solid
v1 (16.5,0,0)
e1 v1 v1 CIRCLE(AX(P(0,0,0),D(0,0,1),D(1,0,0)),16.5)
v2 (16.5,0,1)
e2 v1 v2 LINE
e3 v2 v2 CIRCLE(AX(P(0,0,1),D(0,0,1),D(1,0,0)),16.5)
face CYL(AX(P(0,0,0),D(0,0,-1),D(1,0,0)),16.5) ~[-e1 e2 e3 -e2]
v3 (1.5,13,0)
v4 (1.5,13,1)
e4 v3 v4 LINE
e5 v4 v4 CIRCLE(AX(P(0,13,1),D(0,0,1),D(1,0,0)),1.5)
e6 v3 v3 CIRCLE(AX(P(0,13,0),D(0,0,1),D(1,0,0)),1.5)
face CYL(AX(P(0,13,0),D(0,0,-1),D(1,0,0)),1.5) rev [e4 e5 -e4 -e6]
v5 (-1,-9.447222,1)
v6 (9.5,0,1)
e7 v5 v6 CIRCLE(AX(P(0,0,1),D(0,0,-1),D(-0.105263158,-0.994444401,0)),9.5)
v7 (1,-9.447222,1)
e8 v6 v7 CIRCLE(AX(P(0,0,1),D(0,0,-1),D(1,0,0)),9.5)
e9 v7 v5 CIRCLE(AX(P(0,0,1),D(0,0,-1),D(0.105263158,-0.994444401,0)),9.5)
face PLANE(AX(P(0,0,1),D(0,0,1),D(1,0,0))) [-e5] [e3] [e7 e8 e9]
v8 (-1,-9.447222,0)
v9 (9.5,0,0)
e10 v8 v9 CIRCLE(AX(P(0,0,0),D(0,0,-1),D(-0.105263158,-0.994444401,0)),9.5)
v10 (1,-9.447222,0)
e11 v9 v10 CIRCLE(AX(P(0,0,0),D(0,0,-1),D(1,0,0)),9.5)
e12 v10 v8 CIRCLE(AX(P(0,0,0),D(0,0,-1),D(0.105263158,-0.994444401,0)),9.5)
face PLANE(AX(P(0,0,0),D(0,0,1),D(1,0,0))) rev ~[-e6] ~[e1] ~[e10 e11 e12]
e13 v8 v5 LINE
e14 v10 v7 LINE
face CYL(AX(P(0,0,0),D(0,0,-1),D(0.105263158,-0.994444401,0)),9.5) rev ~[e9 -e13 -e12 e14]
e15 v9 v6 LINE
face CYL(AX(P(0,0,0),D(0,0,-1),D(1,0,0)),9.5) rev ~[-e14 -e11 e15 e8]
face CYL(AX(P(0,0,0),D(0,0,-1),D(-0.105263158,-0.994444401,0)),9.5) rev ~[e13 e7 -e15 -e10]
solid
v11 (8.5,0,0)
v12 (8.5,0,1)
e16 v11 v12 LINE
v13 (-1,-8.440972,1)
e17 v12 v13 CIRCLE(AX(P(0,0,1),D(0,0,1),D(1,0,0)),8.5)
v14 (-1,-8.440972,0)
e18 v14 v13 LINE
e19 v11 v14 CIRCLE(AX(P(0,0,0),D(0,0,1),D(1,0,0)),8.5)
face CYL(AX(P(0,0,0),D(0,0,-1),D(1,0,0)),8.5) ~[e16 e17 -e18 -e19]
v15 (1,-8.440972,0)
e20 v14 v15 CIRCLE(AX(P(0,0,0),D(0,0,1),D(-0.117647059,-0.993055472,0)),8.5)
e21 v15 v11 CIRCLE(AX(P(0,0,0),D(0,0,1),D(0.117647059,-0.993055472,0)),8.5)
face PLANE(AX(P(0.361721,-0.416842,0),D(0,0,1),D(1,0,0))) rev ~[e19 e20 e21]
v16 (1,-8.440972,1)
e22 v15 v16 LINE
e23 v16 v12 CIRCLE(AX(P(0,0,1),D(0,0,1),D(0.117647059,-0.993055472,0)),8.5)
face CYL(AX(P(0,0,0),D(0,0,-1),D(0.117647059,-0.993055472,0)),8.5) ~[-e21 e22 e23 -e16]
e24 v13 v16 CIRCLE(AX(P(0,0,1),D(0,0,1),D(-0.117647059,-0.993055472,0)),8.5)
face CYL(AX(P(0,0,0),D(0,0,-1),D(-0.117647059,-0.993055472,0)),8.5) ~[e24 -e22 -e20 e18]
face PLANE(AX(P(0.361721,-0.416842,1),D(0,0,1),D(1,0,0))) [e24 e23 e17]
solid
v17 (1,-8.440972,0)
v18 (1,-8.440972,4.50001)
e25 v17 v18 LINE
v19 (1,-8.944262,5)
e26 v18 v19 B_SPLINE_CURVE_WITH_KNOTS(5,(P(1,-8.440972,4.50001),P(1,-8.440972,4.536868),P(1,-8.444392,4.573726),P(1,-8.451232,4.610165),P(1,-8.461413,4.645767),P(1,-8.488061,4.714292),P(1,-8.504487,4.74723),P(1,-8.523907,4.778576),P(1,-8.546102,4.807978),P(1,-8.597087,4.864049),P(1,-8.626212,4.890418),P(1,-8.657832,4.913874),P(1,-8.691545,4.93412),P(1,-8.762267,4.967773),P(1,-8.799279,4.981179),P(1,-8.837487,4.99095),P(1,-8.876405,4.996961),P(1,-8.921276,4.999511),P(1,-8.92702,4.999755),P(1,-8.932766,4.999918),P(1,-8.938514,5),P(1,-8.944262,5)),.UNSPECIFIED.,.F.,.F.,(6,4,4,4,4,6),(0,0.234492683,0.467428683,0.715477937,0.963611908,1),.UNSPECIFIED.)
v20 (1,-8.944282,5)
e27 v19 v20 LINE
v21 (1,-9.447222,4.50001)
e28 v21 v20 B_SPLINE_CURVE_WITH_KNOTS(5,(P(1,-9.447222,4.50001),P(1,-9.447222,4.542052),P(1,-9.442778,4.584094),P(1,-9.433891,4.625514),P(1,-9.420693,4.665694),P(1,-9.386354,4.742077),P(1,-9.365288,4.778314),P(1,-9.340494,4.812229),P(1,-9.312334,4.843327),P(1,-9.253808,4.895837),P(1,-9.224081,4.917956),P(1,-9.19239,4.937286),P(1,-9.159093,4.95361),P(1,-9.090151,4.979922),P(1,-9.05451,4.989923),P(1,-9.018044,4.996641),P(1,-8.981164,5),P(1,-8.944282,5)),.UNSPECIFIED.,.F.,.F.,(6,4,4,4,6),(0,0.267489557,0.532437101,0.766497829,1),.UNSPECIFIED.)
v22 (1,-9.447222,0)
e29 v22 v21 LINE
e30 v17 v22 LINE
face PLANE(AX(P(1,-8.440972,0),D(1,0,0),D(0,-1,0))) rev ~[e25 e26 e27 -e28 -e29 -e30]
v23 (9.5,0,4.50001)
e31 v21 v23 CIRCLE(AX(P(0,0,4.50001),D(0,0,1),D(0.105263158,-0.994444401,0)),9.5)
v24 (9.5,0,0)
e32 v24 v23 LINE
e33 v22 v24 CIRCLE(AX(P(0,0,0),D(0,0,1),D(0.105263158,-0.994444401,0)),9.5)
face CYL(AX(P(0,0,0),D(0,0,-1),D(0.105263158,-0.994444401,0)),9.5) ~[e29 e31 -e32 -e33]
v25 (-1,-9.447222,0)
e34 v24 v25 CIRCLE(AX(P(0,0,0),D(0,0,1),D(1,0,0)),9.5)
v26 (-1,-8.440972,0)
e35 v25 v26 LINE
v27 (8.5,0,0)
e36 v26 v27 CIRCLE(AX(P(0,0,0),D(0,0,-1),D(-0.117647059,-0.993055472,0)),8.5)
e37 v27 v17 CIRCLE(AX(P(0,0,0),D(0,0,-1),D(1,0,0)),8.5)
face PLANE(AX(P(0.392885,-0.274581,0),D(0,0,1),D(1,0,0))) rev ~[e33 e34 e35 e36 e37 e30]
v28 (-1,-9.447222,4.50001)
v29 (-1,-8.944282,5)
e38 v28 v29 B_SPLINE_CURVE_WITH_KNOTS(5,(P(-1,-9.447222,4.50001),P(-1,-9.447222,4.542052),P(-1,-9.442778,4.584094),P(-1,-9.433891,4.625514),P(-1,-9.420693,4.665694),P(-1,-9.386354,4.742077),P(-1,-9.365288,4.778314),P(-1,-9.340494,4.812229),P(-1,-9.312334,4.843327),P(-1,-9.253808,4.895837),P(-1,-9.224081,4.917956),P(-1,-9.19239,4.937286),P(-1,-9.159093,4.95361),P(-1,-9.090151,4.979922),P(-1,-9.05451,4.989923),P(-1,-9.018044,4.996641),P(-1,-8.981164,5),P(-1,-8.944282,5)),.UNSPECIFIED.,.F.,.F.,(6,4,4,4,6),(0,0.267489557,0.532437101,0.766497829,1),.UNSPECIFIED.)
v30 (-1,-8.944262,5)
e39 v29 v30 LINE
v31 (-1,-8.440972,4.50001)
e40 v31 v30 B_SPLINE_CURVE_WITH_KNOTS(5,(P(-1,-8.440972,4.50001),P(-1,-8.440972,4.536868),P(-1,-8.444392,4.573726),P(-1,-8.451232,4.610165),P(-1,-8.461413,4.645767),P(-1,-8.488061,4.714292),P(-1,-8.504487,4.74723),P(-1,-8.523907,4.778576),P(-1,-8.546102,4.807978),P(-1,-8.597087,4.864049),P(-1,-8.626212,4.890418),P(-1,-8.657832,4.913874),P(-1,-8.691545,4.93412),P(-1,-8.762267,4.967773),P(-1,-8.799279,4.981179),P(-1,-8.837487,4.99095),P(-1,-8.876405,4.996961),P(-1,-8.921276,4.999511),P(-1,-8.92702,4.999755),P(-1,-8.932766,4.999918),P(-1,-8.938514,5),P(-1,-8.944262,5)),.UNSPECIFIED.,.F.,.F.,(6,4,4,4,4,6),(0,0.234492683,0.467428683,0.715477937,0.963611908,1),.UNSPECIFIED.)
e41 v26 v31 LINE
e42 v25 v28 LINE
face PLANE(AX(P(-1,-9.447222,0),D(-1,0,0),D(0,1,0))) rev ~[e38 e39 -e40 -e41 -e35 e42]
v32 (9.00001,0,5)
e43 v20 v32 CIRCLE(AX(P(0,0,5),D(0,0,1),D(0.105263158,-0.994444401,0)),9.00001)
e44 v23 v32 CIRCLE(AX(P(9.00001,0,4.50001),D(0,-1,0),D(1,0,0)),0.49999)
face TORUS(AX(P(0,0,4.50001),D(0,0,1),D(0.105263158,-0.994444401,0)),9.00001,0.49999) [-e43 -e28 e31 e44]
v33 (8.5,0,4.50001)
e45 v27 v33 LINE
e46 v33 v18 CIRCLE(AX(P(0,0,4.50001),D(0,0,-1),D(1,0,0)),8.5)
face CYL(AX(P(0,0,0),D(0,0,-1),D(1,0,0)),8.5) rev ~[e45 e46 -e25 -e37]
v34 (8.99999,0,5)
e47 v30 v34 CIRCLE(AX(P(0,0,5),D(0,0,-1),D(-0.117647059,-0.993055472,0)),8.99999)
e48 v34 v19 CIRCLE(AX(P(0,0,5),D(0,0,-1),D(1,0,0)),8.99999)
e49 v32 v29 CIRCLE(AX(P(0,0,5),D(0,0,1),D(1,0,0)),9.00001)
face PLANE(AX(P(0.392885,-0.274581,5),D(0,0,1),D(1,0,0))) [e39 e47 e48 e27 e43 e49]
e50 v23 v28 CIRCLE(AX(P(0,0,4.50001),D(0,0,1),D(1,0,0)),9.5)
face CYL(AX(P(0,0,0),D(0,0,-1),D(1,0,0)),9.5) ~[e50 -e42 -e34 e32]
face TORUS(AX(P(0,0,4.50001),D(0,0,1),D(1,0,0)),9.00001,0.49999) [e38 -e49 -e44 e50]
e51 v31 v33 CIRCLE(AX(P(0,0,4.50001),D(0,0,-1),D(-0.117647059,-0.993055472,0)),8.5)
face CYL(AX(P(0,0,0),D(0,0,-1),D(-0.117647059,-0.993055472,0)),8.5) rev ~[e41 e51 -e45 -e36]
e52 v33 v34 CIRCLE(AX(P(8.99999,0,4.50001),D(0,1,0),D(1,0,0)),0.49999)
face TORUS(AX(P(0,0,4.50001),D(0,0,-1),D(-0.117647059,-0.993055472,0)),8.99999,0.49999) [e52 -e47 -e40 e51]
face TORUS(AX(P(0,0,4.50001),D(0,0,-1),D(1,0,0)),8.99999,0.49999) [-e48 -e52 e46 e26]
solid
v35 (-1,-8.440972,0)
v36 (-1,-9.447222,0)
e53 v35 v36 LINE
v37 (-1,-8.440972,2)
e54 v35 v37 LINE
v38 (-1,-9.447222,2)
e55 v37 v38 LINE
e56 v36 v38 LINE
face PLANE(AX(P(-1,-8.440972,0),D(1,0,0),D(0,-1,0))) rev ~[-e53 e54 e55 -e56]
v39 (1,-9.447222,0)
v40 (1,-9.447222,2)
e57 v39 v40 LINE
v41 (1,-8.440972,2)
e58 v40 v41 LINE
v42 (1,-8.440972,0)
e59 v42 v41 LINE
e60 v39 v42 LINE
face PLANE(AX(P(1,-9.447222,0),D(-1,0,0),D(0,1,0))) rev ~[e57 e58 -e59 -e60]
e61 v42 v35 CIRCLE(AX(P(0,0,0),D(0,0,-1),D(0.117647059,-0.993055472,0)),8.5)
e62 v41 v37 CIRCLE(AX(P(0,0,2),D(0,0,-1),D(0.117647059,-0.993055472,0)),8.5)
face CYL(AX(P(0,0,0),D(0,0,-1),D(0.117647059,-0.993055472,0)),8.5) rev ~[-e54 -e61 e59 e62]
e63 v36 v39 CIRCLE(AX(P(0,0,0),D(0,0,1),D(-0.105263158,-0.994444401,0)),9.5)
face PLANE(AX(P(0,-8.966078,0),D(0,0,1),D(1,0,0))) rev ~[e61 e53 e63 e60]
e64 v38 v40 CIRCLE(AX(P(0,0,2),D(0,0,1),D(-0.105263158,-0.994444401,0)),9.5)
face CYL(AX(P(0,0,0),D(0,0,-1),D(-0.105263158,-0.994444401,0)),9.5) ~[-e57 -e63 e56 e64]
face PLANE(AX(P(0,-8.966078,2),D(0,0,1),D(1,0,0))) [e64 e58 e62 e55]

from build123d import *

# Parameters (mm, degrees)
F0_R     = 16.5
F0_R_2   = 1.5
F1_DEPTH = 1
F2_DEPTH = 5
F3_DEPTH = 2
F4_R     = 0.49999


# Not quite as in the source:
# - a fillet or chamfer is up to 0.001 mm smaller than in the source, because OpenCascade refuses the exact size


with BuildPart() as f1:
    # F0 (on Top) → F1 (new body)
    with BuildSketch(Plane.XY):
        Circle(F0_R)
        with BuildLine():
            ThreePointArc((-1, -9.4472218138), (-6.3541325136, 7.0622234459), (9.5, 0))
            ThreePointArc((9.5, 0), (7.0622234459, -6.3541325136), (1, -9.4472218138))
            ThreePointArc((1, -9.4472218138), (0, -9.5), (-1, -9.4472218138))
        make_face(mode=Mode.SUBTRACT)
        with Locations((0, 13)):
            Circle(F0_R_2, mode=Mode.SUBTRACT)
    extrude(amount=F1_DEPTH)


with BuildPart() as f1b:
    # F0 (on Top) → F1, piece 2 (new body)
    with BuildSketch(Plane.XY):
        with BuildLine():
            ThreePointArc((8.5, 0), (-5.6457948953, 6.3541325136), (-1, -8.4409715081))
            ThreePointArc((-1, -8.4409715081), (0, -8.5), (1, -8.4409715081))
            ThreePointArc((1, -8.4409715081), (6.3541325136, -5.6457948953), (8.5, 0))
        make_face()
    extrude(amount=F1_DEPTH)


with BuildPart() as f2:
    # F0 (on Top) → F2 (new body)
    with BuildSketch(Plane.XY):
        with BuildLine():
            ThreePointArc((1, -9.4472218138), (7.0622234459, -6.3541325136), (9.5, 0))
            ThreePointArc((9.5, 0), (-6.3541325136, 7.0622234459), (-1, -9.4472218138))
            Line((-1, -9.4472218138), (-1, -8.4409715081))
            ThreePointArc((-1, -8.4409715081), (-5.6457948953, 6.3541325136), (8.5, 0))
            ThreePointArc((8.5, 0), (6.3541325136, -5.6457948953), (1, -8.4409715081))
            Line((1, -8.4409715081), (1, -9.4472218138))
        make_face()
    extrude(amount=F2_DEPTH)

    # F4 (radius 0.5 in the source; OpenCascade refuses exactly that, so slightly less here)
    f4_edges = [f2.edges().sort_by_distance(p)[0] for p in [
        (0, 9.5, 5),
        (-5.645795, 6.354133, 5),
    ]]
    fillet(f4_edges, radius=F4_R)


with BuildPart() as f3:
    # F0 (on Top) → F3 (new body)
    with BuildSketch(Plane.XY):
        with BuildLine():
            Line((-1, -8.4409715081), (-1, -9.4472218138))
            ThreePointArc((-1, -9.4472218138), (0, -9.5), (1, -9.4472218138))
            Line((1, -9.4472218138), (1, -8.4409715081))
            ThreePointArc((1, -8.4409715081), (0, -8.5), (-1, -8.4409715081))
        make_face()
    extrude(amount=F3_DEPTH)


solid = Compound([f1.part, f1b.part, f2.part, f3.part])
